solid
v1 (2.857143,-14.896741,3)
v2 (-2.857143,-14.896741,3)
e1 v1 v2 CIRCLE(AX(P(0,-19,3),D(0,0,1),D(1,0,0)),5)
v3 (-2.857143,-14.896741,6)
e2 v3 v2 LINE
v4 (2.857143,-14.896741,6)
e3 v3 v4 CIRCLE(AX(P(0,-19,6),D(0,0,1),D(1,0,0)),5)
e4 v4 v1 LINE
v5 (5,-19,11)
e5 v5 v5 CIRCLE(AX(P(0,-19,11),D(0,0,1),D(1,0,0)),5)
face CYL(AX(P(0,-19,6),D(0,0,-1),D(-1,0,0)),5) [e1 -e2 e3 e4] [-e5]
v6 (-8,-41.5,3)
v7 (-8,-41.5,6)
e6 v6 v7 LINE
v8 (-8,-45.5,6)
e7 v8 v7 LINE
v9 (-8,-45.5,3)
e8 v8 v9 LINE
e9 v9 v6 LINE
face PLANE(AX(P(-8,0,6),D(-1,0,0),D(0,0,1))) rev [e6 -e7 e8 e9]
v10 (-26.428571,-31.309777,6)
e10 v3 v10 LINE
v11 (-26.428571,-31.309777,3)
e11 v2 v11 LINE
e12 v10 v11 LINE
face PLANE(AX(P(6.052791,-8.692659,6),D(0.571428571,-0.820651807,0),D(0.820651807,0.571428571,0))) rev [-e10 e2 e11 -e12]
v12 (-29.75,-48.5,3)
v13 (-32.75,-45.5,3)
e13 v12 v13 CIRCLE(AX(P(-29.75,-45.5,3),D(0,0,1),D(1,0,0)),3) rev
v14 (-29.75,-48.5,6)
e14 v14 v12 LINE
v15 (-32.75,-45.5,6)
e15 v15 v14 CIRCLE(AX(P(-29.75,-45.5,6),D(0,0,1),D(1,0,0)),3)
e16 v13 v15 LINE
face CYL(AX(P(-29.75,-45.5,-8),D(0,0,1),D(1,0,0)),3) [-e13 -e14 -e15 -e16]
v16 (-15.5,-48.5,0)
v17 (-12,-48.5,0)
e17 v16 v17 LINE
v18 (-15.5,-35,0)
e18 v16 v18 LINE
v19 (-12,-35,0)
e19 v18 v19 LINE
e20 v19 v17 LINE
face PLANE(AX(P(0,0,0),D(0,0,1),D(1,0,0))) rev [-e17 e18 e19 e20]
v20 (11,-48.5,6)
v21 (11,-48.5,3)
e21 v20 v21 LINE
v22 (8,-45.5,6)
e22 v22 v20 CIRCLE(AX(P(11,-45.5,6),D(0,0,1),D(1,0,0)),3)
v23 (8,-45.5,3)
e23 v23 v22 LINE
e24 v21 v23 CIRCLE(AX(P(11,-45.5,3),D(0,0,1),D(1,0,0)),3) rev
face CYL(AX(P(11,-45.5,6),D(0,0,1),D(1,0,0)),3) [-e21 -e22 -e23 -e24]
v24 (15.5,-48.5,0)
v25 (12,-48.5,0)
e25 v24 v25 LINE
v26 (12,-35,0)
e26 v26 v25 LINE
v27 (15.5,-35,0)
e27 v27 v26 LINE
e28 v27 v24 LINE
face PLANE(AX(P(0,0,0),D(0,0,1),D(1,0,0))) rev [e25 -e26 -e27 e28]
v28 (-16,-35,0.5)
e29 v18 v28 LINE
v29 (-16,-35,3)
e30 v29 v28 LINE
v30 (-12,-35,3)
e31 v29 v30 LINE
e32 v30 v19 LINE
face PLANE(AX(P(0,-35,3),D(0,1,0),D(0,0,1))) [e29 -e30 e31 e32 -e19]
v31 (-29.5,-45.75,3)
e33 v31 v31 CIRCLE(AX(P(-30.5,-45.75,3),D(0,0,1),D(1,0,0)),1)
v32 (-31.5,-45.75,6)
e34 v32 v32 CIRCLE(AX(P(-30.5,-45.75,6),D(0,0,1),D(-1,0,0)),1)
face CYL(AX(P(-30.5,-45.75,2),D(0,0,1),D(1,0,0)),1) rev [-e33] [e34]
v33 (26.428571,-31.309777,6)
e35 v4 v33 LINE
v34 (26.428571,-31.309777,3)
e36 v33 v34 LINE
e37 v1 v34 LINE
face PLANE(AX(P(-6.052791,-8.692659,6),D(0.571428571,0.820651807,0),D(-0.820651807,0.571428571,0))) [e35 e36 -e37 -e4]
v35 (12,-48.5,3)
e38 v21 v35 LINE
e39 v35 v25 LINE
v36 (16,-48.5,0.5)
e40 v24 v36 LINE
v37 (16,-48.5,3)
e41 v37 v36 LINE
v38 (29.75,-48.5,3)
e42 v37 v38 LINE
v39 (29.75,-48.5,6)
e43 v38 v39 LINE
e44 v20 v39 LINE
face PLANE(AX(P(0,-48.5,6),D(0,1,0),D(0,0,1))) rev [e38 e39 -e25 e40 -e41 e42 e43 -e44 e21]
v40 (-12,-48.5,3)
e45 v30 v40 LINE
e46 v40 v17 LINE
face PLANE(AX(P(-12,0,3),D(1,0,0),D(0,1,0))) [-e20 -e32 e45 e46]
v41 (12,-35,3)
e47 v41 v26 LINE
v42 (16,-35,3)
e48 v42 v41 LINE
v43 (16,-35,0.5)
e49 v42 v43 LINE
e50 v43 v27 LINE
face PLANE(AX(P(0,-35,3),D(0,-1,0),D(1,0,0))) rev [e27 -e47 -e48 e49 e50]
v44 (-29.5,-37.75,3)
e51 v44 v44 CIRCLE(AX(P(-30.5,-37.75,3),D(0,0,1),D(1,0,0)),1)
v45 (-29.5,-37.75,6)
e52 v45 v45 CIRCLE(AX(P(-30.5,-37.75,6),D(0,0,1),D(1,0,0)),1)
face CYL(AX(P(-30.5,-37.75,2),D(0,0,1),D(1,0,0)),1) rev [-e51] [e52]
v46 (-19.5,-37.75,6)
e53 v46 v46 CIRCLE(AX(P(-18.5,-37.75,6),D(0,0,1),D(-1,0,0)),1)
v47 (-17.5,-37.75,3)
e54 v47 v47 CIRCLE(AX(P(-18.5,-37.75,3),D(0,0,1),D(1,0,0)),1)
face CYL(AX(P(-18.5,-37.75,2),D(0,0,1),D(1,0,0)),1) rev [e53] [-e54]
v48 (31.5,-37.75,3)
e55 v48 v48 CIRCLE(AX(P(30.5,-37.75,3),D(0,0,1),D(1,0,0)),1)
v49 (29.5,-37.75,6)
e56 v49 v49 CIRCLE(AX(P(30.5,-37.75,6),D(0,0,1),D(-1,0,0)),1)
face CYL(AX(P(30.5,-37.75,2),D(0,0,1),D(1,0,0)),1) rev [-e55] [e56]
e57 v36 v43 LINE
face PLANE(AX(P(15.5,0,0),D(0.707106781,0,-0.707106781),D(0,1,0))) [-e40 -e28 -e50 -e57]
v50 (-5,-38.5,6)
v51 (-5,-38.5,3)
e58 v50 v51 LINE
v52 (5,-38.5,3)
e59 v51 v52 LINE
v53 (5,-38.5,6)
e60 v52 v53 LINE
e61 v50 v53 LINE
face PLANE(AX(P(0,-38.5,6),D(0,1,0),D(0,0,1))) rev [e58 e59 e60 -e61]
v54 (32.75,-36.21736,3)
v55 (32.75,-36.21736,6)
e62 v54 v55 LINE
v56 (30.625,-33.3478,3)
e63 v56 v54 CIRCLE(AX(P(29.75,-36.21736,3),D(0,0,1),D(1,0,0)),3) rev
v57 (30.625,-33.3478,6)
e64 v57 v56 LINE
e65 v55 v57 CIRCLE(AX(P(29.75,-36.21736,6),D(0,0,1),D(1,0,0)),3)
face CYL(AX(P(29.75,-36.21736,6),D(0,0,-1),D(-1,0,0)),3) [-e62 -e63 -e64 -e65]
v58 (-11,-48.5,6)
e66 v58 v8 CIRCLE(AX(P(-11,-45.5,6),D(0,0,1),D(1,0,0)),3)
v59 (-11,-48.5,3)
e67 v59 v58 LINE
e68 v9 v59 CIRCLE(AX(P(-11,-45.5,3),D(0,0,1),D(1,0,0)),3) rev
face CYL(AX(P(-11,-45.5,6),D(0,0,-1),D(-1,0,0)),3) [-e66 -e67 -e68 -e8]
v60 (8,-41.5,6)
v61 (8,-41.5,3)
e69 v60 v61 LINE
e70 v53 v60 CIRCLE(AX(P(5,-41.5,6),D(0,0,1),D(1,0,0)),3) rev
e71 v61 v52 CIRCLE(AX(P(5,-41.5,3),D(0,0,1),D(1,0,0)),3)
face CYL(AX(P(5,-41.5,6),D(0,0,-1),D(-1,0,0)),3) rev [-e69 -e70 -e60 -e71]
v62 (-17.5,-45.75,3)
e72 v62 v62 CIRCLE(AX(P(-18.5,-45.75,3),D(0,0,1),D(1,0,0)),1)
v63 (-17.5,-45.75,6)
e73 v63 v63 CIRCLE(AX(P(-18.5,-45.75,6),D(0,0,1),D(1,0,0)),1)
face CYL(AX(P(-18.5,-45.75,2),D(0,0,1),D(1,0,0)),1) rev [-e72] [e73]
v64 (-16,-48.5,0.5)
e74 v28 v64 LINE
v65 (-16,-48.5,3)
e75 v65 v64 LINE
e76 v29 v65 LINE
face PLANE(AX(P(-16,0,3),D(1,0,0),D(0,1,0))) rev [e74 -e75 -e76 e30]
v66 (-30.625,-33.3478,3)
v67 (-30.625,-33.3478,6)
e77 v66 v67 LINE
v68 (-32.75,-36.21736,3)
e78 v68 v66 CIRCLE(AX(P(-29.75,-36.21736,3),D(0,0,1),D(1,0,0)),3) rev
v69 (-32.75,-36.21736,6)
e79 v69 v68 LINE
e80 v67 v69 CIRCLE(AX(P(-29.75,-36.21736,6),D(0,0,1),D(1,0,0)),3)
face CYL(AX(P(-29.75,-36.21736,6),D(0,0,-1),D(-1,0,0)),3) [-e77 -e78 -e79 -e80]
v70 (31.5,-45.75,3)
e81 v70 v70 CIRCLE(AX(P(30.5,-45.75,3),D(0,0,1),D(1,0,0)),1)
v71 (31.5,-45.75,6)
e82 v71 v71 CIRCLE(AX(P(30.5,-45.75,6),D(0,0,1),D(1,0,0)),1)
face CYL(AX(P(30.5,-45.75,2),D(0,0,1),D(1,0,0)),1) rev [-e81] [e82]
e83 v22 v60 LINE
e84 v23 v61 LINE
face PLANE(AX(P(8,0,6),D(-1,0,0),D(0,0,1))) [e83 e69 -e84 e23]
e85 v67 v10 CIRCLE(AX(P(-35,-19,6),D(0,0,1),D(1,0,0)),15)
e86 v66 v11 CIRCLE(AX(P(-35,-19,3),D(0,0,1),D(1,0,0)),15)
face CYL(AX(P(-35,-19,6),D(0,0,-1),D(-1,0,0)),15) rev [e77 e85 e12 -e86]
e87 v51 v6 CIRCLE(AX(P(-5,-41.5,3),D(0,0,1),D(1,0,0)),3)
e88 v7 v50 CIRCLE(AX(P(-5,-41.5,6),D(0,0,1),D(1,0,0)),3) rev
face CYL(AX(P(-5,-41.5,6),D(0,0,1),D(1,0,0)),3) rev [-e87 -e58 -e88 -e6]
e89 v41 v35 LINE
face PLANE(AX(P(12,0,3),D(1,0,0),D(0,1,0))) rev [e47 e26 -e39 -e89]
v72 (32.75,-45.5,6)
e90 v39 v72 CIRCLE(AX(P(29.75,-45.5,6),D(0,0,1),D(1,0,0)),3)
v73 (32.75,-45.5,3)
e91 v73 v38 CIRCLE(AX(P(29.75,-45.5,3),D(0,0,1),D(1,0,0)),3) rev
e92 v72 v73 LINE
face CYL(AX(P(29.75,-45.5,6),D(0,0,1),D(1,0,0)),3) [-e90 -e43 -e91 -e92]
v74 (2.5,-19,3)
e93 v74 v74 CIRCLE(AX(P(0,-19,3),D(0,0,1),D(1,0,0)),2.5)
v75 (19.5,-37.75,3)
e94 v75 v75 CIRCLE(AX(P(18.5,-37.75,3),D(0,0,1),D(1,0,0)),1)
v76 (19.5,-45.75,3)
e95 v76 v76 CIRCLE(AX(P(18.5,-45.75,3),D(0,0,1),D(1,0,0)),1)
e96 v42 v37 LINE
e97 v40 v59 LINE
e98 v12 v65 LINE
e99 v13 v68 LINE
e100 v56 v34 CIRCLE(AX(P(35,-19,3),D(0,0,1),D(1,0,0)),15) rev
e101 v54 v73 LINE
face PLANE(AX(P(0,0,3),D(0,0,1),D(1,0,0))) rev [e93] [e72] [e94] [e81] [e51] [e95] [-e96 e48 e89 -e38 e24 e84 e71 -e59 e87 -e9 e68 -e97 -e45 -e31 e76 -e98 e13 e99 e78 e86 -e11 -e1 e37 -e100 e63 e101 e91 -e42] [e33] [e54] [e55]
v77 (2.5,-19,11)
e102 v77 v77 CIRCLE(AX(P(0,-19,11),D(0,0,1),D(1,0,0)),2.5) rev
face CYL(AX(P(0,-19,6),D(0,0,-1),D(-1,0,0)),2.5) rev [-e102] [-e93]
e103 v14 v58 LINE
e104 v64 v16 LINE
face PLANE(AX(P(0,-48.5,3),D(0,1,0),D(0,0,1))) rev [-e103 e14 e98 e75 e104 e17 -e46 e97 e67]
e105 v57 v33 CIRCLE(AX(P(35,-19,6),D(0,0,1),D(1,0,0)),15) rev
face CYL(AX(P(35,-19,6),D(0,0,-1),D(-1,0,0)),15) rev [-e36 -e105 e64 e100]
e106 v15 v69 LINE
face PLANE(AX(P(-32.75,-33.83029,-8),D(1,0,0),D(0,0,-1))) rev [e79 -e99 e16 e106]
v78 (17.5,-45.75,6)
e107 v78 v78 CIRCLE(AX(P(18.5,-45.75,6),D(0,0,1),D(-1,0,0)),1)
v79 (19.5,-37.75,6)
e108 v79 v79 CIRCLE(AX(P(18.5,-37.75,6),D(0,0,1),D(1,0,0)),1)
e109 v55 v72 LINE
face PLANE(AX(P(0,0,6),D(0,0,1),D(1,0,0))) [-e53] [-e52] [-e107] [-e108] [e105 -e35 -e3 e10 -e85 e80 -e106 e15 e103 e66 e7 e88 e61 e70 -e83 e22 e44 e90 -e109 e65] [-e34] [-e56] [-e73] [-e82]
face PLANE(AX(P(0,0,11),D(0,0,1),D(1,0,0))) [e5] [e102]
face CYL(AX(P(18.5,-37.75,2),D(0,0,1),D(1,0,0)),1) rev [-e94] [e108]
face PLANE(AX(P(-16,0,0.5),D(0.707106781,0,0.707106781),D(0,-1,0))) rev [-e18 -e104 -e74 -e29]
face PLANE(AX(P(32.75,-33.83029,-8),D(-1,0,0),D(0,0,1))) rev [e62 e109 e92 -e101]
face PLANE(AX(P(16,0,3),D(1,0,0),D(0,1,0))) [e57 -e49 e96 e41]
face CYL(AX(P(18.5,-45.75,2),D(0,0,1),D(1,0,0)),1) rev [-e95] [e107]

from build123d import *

# Parameters (mm, degrees)
SKETCH_1_W          = 4
SKETCH_1_H          = 13.5
EXTRUDE_1_DEPTH     = 3
EXTRUDE_1_2_DEPTH   = 3
EXTRUDE_1_3_DEPTH   = 3
EXTRUDE_1_4_DEPTH   = 3
SKETCH_2_R          = 2.5
EXTRUDE_2_DEPTH     = 3
FILLET_3_R          = 3
FILLET_4_R          = 5
CHAMFER_1_SIZE      = 0.5
SKETCH_5_R          = 1
CUT_EXTRUDE_3_DEPTH = 4
CUT_EXTRUDE_START   = -14
CUT_EXTRUDE_4_DEPTH = 14
FILLET_6_R          = 3
SKETCH_10_R         = 2.5
EXTRUDE_5_DEPTH     = 5


with BuildPart() as part:
    # 草图1 → 凸台-拉伸1 (new body)
    with BuildSketch(Plane.XY):
        with Locations((-35, -41.75)):
            Rectangle(SKETCH_1_W, SKETCH_1_H)
    extrude(amount=EXTRUDE_1_DEPTH)



with BuildPart() as body_2:
    # 草图1 → Extrude 1 2 (new body)
    with BuildSketch(Plane.XY):
        with Locations((-14, -41.75)):
            Rectangle(SKETCH_1_W, SKETCH_1_H)
    extrude(amount=EXTRUDE_1_2_DEPTH)


with BuildPart() as body_3:
    # 草图1 → Extrude 1 3 (new body)
    with BuildSketch(Plane.XY):
        with Locations((14, -41.75)):
            Rectangle(SKETCH_1_W, SKETCH_1_H)
    extrude(amount=EXTRUDE_1_3_DEPTH)


with BuildPart() as body_4:
    # 草图1 → Extrude 1 4 (new body)
    with BuildSketch(Plane.XY):
        with Locations((35, -41.75)):
            Rectangle(SKETCH_1_W, SKETCH_1_H)
    extrude(amount=EXTRUDE_1_4_DEPTH)


with BuildPart() as part_1:
    add(part.part)

    add(body_2.part)  # 凸台-拉伸2 merges body 2

    add(body_3.part)  # 凸台-拉伸2 merges body 3

    add(body_4.part)  # 凸台-拉伸2 merges body 4
    # 草图2 → 凸台-拉伸2 (add)
    with BuildSketch(Plane.XY.offset(3)):
        with BuildLine():
            Line((-37, -35), (-37, -48.5))
            Line((-37, -48.5), (-12, -48.5))
            Line((-12, -48.5), (-8, -48.5))
            Line((-8, -48.5), (-8, -38.5))
            Line((-8, -38.5), (8, -38.5))
            Line((8, -38.5), (8, -48.5))
            Line((8, -48.5), (12, -48.5))
            Line((12, -48.5), (37, -48.5))
            Line((37, -48.5), (37, -35))
            Line((37, -35), (37, -34))
            Line((37, -34), (35, -34))
            ThreePointArc((35, -34), (30.508154972, -33.311650088), (26.428571429, -31.3097771))
            Line((26.428571429, -31.3097771), (2.857142857, -14.896740967))
            ThreePointArc((2.857142857, -14.896740967), (0, -14), (-2.857142857, -14.896740967))
            Line((-2.857142857, -14.896740967), (-26.428571429, -31.3097771))
            ThreePointArc((-26.428571429, -31.3097771), (-30.508154972, -33.311650088), (-35, -34))
            Line((-35, -34), (-37, -34))
            Line((-37, -34), (-37, -35))
        make_face()
        with Locations((0, -19)):
            Circle(SKETCH_2_R, mode=Mode.SUBTRACT)
    extrude(amount=EXTRUDE_2_DEPTH)

    # 圆角3
    fillet_3_edges = [part_1.edges().sort_by_distance(p)[0] for p in [
        (-8, -48.5, 4.5),
        (-8, -38.5, 4.5),
        (8, -38.5, 4.5),
        (8, -48.5, 4.5),
        (37, -48.5, 3),
        (-37, -48.5, 3),
    ]]
    fillet(fillet_3_edges, radius=FILLET_3_R)

    # 圆角4
    # the kernel refuses this fillet: 5 mm, written as the material it takes off along each edge
    with BuildSketch(Plane(origin=(37, -34, -8.934299833), x_dir=(0, -1, 0), z_dir=(0, 0, 1))) as fillet_4_piece_1:
        with BuildLine():
            CenterArc((4.773719933, -5), FILLET_4_R, 90, 81.373073441)
            Line((-0.16971005, -4.25), (-0.664053048, -4.175))
            ThreePointArc((-0.664053048, -4.175), (-0.5, -2), (-0.5, 0))
            Line((-0.5, 0), (0, 0.5))
            Line((0, 0.5), (4.773719933, 0.5))
            Line((4.773719933, 0.5), (4.773719933, 0))
        make_face()
    extrude(amount=26.868599666, mode=Mode.SUBTRACT)
    with BuildSketch(Plane(origin=(-37, -34, -8.934299833), x_dir=(0.9992036788156995, 0.039899977959549054, 0), z_dir=(0, 0, 1))) as fillet_4_piece_2:
        with BuildLine():
            CenterArc((4.805547074, -4.969418409), FILLET_4_R, 96.340219202, 81.373073441)
            Line((-0.19047132, -4.769918519), (-0.69007316, -4.74996853))
            Line((-0.69007316, -4.74996853), (-0.499601839, 0.019949989))
            Line((-0.499601839, 0.019949989), (0.019949989, 0.499601839))
            ThreePointArc((0.019949989, 0.499601839), (2.018357347, 0.419801883), (4.198171061, 0.496941841))
            Line((4.198171061, 0.496941841), (4.253387062, 0))
        make_face()
    extrude(amount=26.868599666, mode=Mode.SUBTRACT)

    # 倒角1
    chamfer_1_edges = [part_1.edges().sort_by_distance(p)[0] for p in [
        (-16, -41.75, 0),
        (-33, -41.75, 0),
        (16, -41.75, 0),
        (33, -41.75, 0),
    ]]
    chamfer(chamfer_1_edges, length=CHAMFER_1_SIZE)

    # 草图5 → 切除-拉伸3 (cut)
    with BuildSketch(Plane.XY.offset(6)):
        with Locations((-18.5, -45.75)):
            Circle(SKETCH_5_R)
        with Locations((-18.5, -37.75)):
            Circle(SKETCH_5_R)
        with Locations((-30.5, -45.75)):
            Circle(SKETCH_5_R)
        with Locations((-30.5, -37.75)):
            Circle(SKETCH_5_R)
        with Locations((18.5, -45.75)):
            Circle(SKETCH_5_R)
        with Locations((18.5, -37.75)):
            Circle(SKETCH_5_R)
        with Locations((30.5, -45.75)):
            Circle(SKETCH_5_R)
        with Locations((30.5, -37.75)):
            Circle(SKETCH_5_R)
    extrude(amount=-CUT_EXTRUDE_3_DEPTH, mode=Mode.SUBTRACT)

    # 草图9 → 切除-拉伸4 (cut)
    with BuildSketch(Plane.XY.offset(6).offset(CUT_EXTRUDE_START)):
        with BuildLine():
            Line((37, -45.5), (37, -38.773719933))
            ThreePointArc((37, -38.773719933), (35.791437722, -35.514118731), (32.75, -33.83028995))
            Line((32.75, -33.83028995), (32.75, -48.5))
            Line((32.75, -48.5), (34, -48.5))
            ThreePointArc((34, -48.5), (36.121320344, -47.621320344), (37, -45.5))
        make_face()
        with BuildLine():
            Line((-32.75, -33.83028995), (-32.75, -48.5))
            Line((-32.75, -48.5), (-34, -48.5))
            ThreePointArc((-34, -48.5), (-36.121320344, -47.621320344), (-37, -45.5))
            Line((-37, -45.5), (-37, -38.773719933))
            ThreePointArc((-37, -38.773719933), (-35.791437722, -35.514118731), (-32.75, -33.83028995))
        make_face()
    extrude(amount=CUT_EXTRUDE_4_DEPTH, mode=Mode.SUBTRACT)

    # 圆角6
    fillet_6_edges = [part_1.edges().sort_by_distance(p)[0] for p in [
        (32.75, -33.83028995, 4.5),
        (-32.75, -33.83028995, 4.5),
        (32.75, -48.5, 4.5),
        (-32.75, -48.5, 4.5),
    ]]
    fillet(fillet_6_edges, radius=FILLET_6_R)

    # 草图10 → 凸台-拉伸5 (add)
    with BuildSketch(Plane.XY.offset(6)):
        with BuildLine():
            ThreePointArc((5, -19), (4.432026302, -16.685449751), (2.857142857, -14.896740967))
            ThreePointArc((2.857142857, -14.896740967), (0, -14), (-2.857142857, -14.896740967))
            ThreePointArc((-2.857142857, -14.896740967), (-2.314550249, -23.432026302), (5, -19))
        make_face()
        with Locations((0, -19)):
            Circle(SKETCH_10_R, mode=Mode.SUBTRACT)
    extrude(amount=EXTRUDE_5_DEPTH)


solid = part_1.part
